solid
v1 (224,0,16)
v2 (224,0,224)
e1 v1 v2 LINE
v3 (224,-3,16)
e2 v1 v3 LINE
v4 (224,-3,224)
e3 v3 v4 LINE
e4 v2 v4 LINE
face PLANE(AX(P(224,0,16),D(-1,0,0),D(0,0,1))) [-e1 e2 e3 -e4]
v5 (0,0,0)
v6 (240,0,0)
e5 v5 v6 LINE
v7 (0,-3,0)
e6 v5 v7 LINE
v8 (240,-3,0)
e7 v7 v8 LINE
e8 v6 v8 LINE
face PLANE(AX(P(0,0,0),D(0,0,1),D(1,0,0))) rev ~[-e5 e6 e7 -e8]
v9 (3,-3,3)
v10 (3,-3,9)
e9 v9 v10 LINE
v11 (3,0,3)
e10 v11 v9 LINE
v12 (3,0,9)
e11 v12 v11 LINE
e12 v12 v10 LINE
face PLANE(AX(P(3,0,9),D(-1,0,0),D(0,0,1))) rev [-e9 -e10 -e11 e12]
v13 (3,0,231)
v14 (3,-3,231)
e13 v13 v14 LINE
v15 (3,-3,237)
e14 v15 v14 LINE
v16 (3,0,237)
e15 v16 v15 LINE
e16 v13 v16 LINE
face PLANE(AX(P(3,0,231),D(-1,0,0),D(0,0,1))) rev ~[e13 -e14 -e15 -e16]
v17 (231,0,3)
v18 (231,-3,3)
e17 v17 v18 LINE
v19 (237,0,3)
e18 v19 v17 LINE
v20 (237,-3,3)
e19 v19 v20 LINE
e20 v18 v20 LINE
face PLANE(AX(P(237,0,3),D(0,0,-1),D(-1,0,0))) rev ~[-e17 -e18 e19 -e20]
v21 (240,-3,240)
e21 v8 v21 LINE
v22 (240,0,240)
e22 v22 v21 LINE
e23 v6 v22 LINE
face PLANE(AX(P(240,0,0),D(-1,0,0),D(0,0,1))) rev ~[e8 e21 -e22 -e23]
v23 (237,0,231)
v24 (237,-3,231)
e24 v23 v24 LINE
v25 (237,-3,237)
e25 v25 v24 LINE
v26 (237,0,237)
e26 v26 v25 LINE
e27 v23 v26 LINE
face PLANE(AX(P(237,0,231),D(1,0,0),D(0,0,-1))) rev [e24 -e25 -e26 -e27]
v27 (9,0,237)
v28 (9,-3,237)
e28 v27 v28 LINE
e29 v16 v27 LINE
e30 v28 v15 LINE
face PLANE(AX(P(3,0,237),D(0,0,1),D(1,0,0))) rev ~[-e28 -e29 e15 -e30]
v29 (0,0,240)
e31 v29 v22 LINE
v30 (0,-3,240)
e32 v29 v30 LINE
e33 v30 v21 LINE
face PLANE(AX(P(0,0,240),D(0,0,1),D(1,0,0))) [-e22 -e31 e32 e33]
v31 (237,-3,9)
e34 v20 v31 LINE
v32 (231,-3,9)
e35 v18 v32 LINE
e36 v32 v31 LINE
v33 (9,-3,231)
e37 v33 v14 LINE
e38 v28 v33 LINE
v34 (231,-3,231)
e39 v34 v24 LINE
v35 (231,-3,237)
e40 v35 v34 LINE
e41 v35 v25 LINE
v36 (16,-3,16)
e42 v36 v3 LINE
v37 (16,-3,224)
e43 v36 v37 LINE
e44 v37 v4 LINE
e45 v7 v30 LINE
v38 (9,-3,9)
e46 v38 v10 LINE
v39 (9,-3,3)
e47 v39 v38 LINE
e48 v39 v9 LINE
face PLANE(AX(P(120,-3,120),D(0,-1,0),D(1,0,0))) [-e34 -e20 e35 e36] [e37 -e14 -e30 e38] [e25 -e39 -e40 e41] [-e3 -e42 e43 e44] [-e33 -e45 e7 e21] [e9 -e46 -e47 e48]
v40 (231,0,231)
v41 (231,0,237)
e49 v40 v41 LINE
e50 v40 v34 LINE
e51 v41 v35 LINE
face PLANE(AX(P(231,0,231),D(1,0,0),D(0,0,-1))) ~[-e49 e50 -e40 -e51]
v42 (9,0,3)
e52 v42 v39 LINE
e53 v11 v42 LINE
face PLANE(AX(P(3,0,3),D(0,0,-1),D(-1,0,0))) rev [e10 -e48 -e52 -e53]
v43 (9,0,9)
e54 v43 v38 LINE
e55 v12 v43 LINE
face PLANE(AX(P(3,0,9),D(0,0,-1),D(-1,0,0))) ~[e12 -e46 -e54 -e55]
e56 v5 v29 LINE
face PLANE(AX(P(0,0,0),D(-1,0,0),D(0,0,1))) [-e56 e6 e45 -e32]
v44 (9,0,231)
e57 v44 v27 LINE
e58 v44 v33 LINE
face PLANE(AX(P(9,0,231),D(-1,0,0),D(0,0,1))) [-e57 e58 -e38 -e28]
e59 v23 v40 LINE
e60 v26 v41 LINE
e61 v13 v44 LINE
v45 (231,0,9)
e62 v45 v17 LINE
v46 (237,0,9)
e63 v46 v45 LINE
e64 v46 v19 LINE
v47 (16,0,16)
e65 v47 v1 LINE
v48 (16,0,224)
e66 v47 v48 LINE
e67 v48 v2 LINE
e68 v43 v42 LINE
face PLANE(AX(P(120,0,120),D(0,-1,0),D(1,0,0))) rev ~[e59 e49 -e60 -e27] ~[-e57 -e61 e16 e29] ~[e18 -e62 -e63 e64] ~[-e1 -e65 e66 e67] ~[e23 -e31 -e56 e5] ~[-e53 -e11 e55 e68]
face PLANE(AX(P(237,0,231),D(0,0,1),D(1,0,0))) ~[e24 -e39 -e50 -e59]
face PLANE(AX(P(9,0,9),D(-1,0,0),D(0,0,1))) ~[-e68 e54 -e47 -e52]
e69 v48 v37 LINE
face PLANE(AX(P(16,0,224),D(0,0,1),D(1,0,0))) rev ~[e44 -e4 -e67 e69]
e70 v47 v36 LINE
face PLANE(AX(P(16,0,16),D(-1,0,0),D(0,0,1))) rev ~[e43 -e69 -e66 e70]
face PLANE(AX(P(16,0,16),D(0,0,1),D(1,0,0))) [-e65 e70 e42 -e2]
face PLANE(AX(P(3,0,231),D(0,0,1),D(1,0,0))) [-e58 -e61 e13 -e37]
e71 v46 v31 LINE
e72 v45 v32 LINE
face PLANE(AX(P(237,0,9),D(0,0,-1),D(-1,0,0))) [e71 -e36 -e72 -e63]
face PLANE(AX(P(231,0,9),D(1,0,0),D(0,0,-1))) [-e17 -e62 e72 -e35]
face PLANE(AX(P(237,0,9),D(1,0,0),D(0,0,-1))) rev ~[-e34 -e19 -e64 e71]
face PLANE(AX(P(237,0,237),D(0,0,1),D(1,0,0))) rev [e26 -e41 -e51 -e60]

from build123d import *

# Parameters (mm, degrees)
F1_W     = 240
F1_H     = 240
F1_W_2   = 6
F1_H_2   = 6
F1_W_3   = 208
F1_H_3   = 208
F2_DEPTH = 3
F3_DEPTH = 25


with BuildPart() as f2:
    # F1 (on Front) → F2 (new body)
    with BuildSketch(Plane.XZ):
        with Locations((120, 120)):
            Rectangle(F1_W, F1_H)
        with Locations((6, 234)):
            Rectangle(F1_W_2, F1_H_2, mode=Mode.SUBTRACT)
        with Locations((120, 120)):
            Rectangle(F1_W_3, F1_H_3, mode=Mode.SUBTRACT)
        with Locations((6, 234)):
            Rectangle(F1_W_2, F1_H_2)
    extrude(amount=F2_DEPTH)

    # F1 (on Front) → F3 (cut)
    with BuildSketch(Plane.XZ):
        with Locations((6, 234)):
            Rectangle(F1_W_2, F1_H_2)
    extrude(amount=F3_DEPTH, mode=Mode.SUBTRACT)

    # F5: F2 across plane


with BuildPart() as f2_1:
    add(f2.part)
    add(f2.part.mirror(Plane(origin=(120, -1.5, 120), x_dir=(0, -1, 0), z_dir=(-1, 0, 0))), mode=Mode.INTERSECT)

    # F7: F2 across plane


with BuildPart() as f2_2:
    add(f2_1.part)
    add(f2_1.part.mirror(Plane(origin=(120, -1.5, 120), x_dir=(1, 0, 0), z_dir=(0, 0, 1))), mode=Mode.INTERSECT)


solid = f2_2.part
